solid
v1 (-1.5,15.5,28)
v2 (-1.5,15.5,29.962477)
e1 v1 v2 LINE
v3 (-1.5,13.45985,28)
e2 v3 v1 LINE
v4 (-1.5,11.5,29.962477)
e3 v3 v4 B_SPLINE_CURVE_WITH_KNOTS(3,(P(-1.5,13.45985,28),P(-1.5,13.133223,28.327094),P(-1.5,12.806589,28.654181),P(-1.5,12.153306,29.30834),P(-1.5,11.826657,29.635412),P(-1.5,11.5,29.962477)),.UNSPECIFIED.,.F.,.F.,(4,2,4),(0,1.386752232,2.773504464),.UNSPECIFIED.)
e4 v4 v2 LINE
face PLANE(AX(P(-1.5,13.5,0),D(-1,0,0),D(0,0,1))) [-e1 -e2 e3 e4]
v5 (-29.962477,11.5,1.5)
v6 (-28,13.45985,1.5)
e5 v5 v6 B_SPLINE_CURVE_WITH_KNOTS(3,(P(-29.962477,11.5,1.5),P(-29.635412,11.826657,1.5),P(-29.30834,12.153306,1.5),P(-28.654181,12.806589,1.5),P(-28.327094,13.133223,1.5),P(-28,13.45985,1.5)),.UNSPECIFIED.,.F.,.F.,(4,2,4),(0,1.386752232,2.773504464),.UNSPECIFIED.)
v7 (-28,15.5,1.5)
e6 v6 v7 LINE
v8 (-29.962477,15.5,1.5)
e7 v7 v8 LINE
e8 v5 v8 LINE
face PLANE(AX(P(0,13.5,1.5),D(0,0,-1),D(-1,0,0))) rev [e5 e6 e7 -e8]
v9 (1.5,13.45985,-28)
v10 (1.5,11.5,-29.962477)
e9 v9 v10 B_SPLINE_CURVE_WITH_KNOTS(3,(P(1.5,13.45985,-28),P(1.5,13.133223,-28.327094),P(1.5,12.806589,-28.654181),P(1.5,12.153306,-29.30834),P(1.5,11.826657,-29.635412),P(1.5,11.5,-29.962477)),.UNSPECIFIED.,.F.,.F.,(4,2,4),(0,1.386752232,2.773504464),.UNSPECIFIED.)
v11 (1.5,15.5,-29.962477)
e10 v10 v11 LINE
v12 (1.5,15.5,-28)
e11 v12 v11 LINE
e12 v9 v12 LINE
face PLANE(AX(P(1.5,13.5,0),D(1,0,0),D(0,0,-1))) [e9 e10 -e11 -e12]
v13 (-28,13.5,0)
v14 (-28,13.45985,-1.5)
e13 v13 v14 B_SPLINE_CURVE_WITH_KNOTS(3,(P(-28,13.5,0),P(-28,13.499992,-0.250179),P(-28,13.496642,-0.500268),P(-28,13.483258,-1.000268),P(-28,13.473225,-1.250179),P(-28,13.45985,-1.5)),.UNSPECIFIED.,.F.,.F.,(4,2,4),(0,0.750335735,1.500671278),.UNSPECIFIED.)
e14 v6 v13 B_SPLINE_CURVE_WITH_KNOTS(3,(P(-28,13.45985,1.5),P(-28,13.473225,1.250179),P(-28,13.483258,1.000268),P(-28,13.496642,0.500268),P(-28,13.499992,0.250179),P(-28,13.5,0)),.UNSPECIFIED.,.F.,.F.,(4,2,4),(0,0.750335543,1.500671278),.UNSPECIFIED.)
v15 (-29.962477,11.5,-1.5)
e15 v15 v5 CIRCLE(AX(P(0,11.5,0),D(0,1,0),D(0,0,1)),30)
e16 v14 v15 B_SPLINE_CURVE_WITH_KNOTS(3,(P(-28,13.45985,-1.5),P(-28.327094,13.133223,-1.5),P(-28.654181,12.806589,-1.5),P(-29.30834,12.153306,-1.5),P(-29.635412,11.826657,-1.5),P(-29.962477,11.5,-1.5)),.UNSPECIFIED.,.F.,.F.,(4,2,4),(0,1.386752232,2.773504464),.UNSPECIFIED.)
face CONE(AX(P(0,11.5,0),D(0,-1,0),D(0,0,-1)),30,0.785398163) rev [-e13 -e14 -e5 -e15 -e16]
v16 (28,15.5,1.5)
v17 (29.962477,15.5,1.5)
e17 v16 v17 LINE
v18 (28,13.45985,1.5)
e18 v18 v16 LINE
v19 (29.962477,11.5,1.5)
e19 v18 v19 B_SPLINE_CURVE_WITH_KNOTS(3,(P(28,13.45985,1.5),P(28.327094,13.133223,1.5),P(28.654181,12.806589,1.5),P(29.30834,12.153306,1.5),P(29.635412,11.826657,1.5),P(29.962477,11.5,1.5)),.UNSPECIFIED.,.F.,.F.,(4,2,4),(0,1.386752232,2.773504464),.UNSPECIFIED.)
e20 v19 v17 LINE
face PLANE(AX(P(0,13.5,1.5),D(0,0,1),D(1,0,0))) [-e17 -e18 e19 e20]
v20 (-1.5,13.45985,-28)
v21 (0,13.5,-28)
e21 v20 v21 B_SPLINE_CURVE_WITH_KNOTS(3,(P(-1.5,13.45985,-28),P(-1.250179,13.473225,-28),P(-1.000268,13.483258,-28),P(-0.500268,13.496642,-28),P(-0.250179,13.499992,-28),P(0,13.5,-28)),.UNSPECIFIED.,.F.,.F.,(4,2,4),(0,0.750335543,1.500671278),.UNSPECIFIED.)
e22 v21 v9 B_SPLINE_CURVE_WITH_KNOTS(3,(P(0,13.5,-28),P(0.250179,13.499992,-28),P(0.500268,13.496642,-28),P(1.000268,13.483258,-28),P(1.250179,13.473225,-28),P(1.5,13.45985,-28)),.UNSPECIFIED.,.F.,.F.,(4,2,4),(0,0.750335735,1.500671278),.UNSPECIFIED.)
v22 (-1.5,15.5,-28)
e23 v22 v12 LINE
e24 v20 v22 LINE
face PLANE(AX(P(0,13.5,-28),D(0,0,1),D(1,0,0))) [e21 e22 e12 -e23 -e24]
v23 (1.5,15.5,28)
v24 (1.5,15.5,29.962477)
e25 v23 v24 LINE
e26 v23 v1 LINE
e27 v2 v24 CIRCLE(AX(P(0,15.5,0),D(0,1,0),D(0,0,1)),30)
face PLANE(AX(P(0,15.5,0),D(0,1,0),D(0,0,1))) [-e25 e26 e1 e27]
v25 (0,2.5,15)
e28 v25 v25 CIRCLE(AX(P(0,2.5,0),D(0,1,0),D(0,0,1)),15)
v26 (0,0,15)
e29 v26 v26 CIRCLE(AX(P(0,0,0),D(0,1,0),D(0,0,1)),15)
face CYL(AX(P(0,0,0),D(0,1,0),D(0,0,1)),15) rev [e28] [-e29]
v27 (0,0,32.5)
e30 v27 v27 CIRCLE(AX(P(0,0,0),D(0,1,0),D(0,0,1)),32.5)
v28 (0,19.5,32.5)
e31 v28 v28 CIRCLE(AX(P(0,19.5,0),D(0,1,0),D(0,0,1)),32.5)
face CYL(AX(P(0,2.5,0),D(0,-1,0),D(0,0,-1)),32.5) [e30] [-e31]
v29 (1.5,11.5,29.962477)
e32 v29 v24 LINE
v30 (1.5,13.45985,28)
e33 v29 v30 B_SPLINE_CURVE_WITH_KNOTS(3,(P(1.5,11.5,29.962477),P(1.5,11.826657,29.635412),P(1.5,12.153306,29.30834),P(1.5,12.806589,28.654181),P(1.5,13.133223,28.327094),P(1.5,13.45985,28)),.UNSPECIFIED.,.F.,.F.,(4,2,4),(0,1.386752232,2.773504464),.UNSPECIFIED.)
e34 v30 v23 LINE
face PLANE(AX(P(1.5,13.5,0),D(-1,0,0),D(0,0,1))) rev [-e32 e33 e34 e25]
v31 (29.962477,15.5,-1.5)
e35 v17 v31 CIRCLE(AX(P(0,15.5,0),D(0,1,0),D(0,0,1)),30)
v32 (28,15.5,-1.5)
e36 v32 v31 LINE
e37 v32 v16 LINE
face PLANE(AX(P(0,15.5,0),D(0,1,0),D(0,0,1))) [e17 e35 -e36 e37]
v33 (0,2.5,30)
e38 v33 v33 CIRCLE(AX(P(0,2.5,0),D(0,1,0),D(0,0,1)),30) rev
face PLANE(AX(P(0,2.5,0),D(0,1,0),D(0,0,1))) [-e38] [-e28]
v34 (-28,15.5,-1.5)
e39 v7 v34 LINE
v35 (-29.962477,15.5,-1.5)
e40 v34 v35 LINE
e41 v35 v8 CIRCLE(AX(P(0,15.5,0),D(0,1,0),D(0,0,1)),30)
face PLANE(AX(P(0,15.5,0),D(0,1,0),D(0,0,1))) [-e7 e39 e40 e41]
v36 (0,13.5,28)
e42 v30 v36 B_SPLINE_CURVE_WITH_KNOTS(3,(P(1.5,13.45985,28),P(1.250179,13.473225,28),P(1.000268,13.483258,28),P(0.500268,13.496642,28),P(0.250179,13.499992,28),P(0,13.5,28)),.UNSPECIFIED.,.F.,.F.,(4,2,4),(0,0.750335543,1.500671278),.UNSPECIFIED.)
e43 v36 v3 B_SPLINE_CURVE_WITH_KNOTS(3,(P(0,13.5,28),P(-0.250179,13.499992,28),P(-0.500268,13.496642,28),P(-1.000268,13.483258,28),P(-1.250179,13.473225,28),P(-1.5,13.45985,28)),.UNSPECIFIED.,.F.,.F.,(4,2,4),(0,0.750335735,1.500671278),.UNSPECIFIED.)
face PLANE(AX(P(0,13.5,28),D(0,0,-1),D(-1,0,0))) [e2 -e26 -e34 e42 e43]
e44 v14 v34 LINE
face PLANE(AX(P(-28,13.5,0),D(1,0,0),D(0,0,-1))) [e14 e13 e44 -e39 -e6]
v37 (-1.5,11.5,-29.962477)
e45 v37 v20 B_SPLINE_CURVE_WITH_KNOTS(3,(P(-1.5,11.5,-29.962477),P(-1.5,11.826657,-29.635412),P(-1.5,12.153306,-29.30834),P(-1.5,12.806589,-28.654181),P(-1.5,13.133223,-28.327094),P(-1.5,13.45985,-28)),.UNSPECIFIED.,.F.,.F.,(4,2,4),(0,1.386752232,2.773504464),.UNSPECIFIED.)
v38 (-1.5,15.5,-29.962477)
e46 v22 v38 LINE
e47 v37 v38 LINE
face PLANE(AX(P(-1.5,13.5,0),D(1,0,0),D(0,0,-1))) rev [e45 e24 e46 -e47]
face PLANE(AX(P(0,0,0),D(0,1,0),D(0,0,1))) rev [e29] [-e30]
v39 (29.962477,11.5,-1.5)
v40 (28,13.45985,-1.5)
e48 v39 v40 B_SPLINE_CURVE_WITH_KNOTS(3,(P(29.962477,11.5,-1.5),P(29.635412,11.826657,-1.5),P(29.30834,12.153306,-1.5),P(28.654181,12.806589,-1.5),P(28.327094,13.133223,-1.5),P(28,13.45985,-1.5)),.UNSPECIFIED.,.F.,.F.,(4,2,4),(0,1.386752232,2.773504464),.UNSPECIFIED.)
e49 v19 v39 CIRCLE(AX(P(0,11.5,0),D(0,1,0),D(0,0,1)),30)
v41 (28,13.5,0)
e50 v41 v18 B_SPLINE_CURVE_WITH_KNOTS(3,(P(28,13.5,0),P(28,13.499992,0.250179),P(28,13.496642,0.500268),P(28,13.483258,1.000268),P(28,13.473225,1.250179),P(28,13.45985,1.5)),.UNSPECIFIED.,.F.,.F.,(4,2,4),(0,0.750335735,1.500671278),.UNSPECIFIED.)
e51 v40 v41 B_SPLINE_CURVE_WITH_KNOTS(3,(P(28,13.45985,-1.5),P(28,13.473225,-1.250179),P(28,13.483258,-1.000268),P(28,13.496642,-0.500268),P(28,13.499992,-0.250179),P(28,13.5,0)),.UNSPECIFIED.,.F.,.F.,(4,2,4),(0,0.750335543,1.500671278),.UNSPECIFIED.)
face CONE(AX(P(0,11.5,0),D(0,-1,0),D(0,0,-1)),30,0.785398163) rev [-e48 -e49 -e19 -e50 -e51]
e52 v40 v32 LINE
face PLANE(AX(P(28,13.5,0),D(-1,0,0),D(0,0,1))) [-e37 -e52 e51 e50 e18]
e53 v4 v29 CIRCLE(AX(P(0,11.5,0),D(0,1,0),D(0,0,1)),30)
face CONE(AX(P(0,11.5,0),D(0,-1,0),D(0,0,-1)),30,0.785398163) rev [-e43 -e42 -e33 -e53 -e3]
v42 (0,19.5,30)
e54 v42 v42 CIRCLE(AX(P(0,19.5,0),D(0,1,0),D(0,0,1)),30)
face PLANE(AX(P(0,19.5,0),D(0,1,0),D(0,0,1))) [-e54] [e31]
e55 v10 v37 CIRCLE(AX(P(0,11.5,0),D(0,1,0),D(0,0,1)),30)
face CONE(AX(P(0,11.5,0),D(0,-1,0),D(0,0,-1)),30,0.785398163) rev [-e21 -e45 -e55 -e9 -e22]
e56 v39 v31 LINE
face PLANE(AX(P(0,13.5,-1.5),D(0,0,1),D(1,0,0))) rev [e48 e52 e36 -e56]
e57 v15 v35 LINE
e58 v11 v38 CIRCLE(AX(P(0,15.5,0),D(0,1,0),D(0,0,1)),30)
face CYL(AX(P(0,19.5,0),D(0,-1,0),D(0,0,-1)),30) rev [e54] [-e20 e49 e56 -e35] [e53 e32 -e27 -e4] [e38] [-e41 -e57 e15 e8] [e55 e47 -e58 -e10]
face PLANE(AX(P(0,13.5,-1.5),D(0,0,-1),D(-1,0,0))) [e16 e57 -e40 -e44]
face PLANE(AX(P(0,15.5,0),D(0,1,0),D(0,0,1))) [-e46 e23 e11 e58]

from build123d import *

# Parameters (mm, degrees)
SKETCH1_R           = 32.5
BOSS_EXTRUDE1_DEPTH = 2.5
SKETCH2_R           = 32.5
SKETCH2_R_2         = 30
BOSS_EXTRUDE2_DEPTH = 17
BOSS_EXTRUDE3_START = -2
BOSS_EXTRUDE3_DEPTH = 2
CHAMFER1_SIZE       = 2
SKETCH4_R           = 15
CUT_EXTRUDE1_DEPTH  = 50.005101775


with BuildPart() as part:
    # Sketch1 → Boss-Extrude1 (new body)
    with BuildSketch(Plane(origin=(0, 0, 0), x_dir=(1, 0, 0), z_dir=(0, 1, 0))):
        with Locations(Location((0, 0, 0), (0, 0, 270))):
            Circle(SKETCH1_R)
    extrude(amount=BOSS_EXTRUDE1_DEPTH)

    # Sketch2 → Boss-Extrude2 (add)
    with BuildSketch(Plane(origin=(0, 2.5, 0), x_dir=(1, 0, 0), z_dir=(0, 1, 0))):
        with Locations(Location((0, 0, 0), (0, 0, 270))):
            Circle(SKETCH2_R)
        with Locations(Location((0, 0, 0), (0, 0, 270))):
            Circle(SKETCH2_R_2, mode=Mode.SUBTRACT)
    extrude(amount=BOSS_EXTRUDE2_DEPTH)

    # Sketch3 → Boss-Extrude3 (add)
    with BuildSketch(Plane(origin=(0, 15.5, 0), x_dir=(1, 0, 0), z_dir=(0, 1, 0)).offset(BOSS_EXTRUDE3_START)):
        with BuildLine():
            Line((-1.5, 28), (1.5, 28))
            Line((1.5, 28), (1.5, 29.962476533))
            ThreePointArc((1.5, 29.962476533), (0, 30), (-1.5, 29.962476533))
            Line((-1.5, 29.962476533), (-1.5, 28))
        make_face()
        with BuildLine():
            Line((-28, 1.5), (-29.962476533, 1.5))
            ThreePointArc((-29.962476533, 1.5), (-30, 0), (-29.962476533, -1.5))
            Line((-29.962476533, -1.5), (-28, -1.5))
            Line((-28, -1.5), (-28, 1.5))
        make_face()
        with BuildLine():
            ThreePointArc((30, 0), (29.990617666, 0.750234632), (29.962476533, 1.5))
            Line((29.962476533, 1.5), (28, 1.5))
            Line((28, 1.5), (28, -1.5))
            Line((28, -1.5), (29.962476533, -1.5))
            ThreePointArc((29.962476533, -1.5), (29.990617666, -0.750234632), (30, 0))
        make_face()
        with BuildLine():
            ThreePointArc((-1.5, -29.962476533), (0, -30), (1.5, -29.962476533))
            Line((1.5, -29.962476533), (1.5, -28))
            Line((1.5, -28), (-1.5, -28))
            Line((-1.5, -28), (-1.5, -29.962476533))
        make_face()
    extrude(amount=BOSS_EXTRUDE3_DEPTH)

    # Chamfer1
    # the kernel refuses this chamfer: 2 mm, written as the material it adds along each edge
    with BuildSketch(Plane(origin=(0, 13.5, 0), x_dir=(0, 0, 1), z_dir=(-1, 0, 0))) as chamfer1_piece_1_section:
        Polygon((30, -CHAMFER1_SIZE), (30 - CHAMFER1_SIZE, 0), (30, 0), align=None)
    chamfer1_piece_1 = revolve(axis=Axis((0, 13.5, 0), (0, 1, 0)), revolution_arc=12.689093413, mode=Mode.PRIVATE)
    chamfer1_piece_1 = split(chamfer1_piece_1, bisect_by=Plane(origin=(1.5, 12.838755732, 29.330774017), z_dir=(-1, 0, 0)), keep=Keep.TOP, mode=Mode.PRIVATE)
    chamfer1_piece_1 = split(chamfer1_piece_1, bisect_by=Plane(origin=(0.749919513, 12.838755732, 28), z_dir=(0, 0, 1)), keep=Keep.TOP, mode=Mode.PRIVATE)
    add(chamfer1_piece_1)
    with BuildSketch(Plane(origin=(0, 13.5, 0), x_dir=(0.9755763292717098, 0, 0.21966070600982865), z_dir=(-0.21966070600982865, 0, 0.9755763292717098))) as chamfer1_piece_2_section:
        Polygon((30, -CHAMFER1_SIZE), (30 - CHAMFER1_SIZE, 0), (30, 0), align=None)
    chamfer1_piece_2 = revolve(axis=Axis((0, 13.5, 0), (0, 1, 0)), revolution_arc=25.378210829, mode=Mode.PRIVATE)
    chamfer1_piece_2 = split(chamfer1_piece_2, bisect_by=Plane(origin=(29.330774007, 12.838755737, 1.5), z_dir=(0, 0, -1)), keep=Keep.TOP, mode=Mode.PRIVATE)
    chamfer1_piece_2 = split(chamfer1_piece_2, bisect_by=Plane(origin=(29.330774007, 12.838755737, -1.5), z_dir=(0, 0, 1)), keep=Keep.TOP, mode=Mode.PRIVATE)
    chamfer1_piece_2 = split(chamfer1_piece_2, bisect_by=Plane(origin=(28, 12.838755737, 0), z_dir=(1, 0, 0)), keep=Keep.TOP, mode=Mode.PRIVATE)
    add(chamfer1_piece_2)
    with BuildSketch(Plane(origin=(0, 13.5, 0), x_dir=(0.21966070600991422, 0, -0.9755763292716906), z_dir=(0.9755763292716906, 0, 0.21966070600991422))) as chamfer1_piece_3_section:
        Polygon((30, -CHAMFER1_SIZE), (30 - CHAMFER1_SIZE, 0), (30, 0), align=None)
    chamfer1_piece_3 = revolve(axis=Axis((0, 13.5, 0), (0, 1, 0)), revolution_arc=25.378210829, mode=Mode.PRIVATE)
    chamfer1_piece_3 = split(chamfer1_piece_3, bisect_by=Plane(origin=(1.5, 12.838755737, -29.330774007), z_dir=(-1, 0, 0)), keep=Keep.TOP, mode=Mode.PRIVATE)
    chamfer1_piece_3 = split(chamfer1_piece_3, bisect_by=Plane(origin=(-1.5, 12.838755737, -29.330774007), z_dir=(1, 0, 0)), keep=Keep.TOP, mode=Mode.PRIVATE)
    chamfer1_piece_3 = split(chamfer1_piece_3, bisect_by=Plane(origin=(0, 12.838755737, -28), z_dir=(0, 0, -1)), keep=Keep.TOP, mode=Mode.PRIVATE)
    add(chamfer1_piece_3)
    with BuildSketch(Plane(origin=(0, 13.5, 0), x_dir=(-0.9755763292716926, 0, -0.21966070600990492), z_dir=(0.21966070600990492, 0, -0.9755763292716926))) as chamfer1_piece_4_section:
        Polygon((30, -CHAMFER1_SIZE), (30 - CHAMFER1_SIZE, 0), (30, 0), align=None)
    chamfer1_piece_4 = revolve(axis=Axis((0, 13.5, 0), (0, 1, 0)), revolution_arc=25.378210829, mode=Mode.PRIVATE)
    chamfer1_piece_4 = split(chamfer1_piece_4, bisect_by=Plane(origin=(-29.330774007, 12.838755737, -1.5), z_dir=(0, 0, 1)), keep=Keep.TOP, mode=Mode.PRIVATE)
    chamfer1_piece_4 = split(chamfer1_piece_4, bisect_by=Plane(origin=(-29.330774007, 12.838755737, 1.5), z_dir=(0, 0, -1)), keep=Keep.TOP, mode=Mode.PRIVATE)
    chamfer1_piece_4 = split(chamfer1_piece_4, bisect_by=Plane(origin=(-28, 12.838755737, 0), z_dir=(-1, 0, 0)), keep=Keep.TOP, mode=Mode.PRIVATE)
    add(chamfer1_piece_4)
    with BuildSketch(Plane(origin=(0, 13.5, 0), x_dir=(-0.2196605016666056, 0, 0.9755763752815949), z_dir=(-0.9755763752815949, 0, -0.2196605016666056))) as chamfer1_piece_5_section:
        Polygon((30, -CHAMFER1_SIZE), (30 - CHAMFER1_SIZE, 0), (30, 0), align=None)
    chamfer1_piece_5 = revolve(axis=Axis((0, 13.5, 0), (0, 1, 0)), revolution_arc=12.689093413, mode=Mode.PRIVATE)
    chamfer1_piece_5 = split(chamfer1_piece_5, bisect_by=Plane(origin=(-1.5, 12.838755737, 29.330774007), z_dir=(1, 0, 0)), keep=Keep.TOP, mode=Mode.PRIVATE)
    chamfer1_piece_5 = split(chamfer1_piece_5, bisect_by=Plane(origin=(-0.749919511, 12.838755737, 28), z_dir=(0, 0, 1)), keep=Keep.TOP, mode=Mode.PRIVATE)
    add(chamfer1_piece_5)

    # Sketch4 → Cut-Extrude1 (cut, through all)
    with BuildSketch(Plane(origin=(0, 2.5, 0), x_dir=(1, 0, 0), z_dir=(0, 1, 0))):
        with Locations(Location((0, 0, 0), (0, 0, 270))):
            Circle(SKETCH4_R)
    extrude(amount=-CUT_EXTRUDE1_DEPTH, mode=Mode.SUBTRACT)


solid = part.part
